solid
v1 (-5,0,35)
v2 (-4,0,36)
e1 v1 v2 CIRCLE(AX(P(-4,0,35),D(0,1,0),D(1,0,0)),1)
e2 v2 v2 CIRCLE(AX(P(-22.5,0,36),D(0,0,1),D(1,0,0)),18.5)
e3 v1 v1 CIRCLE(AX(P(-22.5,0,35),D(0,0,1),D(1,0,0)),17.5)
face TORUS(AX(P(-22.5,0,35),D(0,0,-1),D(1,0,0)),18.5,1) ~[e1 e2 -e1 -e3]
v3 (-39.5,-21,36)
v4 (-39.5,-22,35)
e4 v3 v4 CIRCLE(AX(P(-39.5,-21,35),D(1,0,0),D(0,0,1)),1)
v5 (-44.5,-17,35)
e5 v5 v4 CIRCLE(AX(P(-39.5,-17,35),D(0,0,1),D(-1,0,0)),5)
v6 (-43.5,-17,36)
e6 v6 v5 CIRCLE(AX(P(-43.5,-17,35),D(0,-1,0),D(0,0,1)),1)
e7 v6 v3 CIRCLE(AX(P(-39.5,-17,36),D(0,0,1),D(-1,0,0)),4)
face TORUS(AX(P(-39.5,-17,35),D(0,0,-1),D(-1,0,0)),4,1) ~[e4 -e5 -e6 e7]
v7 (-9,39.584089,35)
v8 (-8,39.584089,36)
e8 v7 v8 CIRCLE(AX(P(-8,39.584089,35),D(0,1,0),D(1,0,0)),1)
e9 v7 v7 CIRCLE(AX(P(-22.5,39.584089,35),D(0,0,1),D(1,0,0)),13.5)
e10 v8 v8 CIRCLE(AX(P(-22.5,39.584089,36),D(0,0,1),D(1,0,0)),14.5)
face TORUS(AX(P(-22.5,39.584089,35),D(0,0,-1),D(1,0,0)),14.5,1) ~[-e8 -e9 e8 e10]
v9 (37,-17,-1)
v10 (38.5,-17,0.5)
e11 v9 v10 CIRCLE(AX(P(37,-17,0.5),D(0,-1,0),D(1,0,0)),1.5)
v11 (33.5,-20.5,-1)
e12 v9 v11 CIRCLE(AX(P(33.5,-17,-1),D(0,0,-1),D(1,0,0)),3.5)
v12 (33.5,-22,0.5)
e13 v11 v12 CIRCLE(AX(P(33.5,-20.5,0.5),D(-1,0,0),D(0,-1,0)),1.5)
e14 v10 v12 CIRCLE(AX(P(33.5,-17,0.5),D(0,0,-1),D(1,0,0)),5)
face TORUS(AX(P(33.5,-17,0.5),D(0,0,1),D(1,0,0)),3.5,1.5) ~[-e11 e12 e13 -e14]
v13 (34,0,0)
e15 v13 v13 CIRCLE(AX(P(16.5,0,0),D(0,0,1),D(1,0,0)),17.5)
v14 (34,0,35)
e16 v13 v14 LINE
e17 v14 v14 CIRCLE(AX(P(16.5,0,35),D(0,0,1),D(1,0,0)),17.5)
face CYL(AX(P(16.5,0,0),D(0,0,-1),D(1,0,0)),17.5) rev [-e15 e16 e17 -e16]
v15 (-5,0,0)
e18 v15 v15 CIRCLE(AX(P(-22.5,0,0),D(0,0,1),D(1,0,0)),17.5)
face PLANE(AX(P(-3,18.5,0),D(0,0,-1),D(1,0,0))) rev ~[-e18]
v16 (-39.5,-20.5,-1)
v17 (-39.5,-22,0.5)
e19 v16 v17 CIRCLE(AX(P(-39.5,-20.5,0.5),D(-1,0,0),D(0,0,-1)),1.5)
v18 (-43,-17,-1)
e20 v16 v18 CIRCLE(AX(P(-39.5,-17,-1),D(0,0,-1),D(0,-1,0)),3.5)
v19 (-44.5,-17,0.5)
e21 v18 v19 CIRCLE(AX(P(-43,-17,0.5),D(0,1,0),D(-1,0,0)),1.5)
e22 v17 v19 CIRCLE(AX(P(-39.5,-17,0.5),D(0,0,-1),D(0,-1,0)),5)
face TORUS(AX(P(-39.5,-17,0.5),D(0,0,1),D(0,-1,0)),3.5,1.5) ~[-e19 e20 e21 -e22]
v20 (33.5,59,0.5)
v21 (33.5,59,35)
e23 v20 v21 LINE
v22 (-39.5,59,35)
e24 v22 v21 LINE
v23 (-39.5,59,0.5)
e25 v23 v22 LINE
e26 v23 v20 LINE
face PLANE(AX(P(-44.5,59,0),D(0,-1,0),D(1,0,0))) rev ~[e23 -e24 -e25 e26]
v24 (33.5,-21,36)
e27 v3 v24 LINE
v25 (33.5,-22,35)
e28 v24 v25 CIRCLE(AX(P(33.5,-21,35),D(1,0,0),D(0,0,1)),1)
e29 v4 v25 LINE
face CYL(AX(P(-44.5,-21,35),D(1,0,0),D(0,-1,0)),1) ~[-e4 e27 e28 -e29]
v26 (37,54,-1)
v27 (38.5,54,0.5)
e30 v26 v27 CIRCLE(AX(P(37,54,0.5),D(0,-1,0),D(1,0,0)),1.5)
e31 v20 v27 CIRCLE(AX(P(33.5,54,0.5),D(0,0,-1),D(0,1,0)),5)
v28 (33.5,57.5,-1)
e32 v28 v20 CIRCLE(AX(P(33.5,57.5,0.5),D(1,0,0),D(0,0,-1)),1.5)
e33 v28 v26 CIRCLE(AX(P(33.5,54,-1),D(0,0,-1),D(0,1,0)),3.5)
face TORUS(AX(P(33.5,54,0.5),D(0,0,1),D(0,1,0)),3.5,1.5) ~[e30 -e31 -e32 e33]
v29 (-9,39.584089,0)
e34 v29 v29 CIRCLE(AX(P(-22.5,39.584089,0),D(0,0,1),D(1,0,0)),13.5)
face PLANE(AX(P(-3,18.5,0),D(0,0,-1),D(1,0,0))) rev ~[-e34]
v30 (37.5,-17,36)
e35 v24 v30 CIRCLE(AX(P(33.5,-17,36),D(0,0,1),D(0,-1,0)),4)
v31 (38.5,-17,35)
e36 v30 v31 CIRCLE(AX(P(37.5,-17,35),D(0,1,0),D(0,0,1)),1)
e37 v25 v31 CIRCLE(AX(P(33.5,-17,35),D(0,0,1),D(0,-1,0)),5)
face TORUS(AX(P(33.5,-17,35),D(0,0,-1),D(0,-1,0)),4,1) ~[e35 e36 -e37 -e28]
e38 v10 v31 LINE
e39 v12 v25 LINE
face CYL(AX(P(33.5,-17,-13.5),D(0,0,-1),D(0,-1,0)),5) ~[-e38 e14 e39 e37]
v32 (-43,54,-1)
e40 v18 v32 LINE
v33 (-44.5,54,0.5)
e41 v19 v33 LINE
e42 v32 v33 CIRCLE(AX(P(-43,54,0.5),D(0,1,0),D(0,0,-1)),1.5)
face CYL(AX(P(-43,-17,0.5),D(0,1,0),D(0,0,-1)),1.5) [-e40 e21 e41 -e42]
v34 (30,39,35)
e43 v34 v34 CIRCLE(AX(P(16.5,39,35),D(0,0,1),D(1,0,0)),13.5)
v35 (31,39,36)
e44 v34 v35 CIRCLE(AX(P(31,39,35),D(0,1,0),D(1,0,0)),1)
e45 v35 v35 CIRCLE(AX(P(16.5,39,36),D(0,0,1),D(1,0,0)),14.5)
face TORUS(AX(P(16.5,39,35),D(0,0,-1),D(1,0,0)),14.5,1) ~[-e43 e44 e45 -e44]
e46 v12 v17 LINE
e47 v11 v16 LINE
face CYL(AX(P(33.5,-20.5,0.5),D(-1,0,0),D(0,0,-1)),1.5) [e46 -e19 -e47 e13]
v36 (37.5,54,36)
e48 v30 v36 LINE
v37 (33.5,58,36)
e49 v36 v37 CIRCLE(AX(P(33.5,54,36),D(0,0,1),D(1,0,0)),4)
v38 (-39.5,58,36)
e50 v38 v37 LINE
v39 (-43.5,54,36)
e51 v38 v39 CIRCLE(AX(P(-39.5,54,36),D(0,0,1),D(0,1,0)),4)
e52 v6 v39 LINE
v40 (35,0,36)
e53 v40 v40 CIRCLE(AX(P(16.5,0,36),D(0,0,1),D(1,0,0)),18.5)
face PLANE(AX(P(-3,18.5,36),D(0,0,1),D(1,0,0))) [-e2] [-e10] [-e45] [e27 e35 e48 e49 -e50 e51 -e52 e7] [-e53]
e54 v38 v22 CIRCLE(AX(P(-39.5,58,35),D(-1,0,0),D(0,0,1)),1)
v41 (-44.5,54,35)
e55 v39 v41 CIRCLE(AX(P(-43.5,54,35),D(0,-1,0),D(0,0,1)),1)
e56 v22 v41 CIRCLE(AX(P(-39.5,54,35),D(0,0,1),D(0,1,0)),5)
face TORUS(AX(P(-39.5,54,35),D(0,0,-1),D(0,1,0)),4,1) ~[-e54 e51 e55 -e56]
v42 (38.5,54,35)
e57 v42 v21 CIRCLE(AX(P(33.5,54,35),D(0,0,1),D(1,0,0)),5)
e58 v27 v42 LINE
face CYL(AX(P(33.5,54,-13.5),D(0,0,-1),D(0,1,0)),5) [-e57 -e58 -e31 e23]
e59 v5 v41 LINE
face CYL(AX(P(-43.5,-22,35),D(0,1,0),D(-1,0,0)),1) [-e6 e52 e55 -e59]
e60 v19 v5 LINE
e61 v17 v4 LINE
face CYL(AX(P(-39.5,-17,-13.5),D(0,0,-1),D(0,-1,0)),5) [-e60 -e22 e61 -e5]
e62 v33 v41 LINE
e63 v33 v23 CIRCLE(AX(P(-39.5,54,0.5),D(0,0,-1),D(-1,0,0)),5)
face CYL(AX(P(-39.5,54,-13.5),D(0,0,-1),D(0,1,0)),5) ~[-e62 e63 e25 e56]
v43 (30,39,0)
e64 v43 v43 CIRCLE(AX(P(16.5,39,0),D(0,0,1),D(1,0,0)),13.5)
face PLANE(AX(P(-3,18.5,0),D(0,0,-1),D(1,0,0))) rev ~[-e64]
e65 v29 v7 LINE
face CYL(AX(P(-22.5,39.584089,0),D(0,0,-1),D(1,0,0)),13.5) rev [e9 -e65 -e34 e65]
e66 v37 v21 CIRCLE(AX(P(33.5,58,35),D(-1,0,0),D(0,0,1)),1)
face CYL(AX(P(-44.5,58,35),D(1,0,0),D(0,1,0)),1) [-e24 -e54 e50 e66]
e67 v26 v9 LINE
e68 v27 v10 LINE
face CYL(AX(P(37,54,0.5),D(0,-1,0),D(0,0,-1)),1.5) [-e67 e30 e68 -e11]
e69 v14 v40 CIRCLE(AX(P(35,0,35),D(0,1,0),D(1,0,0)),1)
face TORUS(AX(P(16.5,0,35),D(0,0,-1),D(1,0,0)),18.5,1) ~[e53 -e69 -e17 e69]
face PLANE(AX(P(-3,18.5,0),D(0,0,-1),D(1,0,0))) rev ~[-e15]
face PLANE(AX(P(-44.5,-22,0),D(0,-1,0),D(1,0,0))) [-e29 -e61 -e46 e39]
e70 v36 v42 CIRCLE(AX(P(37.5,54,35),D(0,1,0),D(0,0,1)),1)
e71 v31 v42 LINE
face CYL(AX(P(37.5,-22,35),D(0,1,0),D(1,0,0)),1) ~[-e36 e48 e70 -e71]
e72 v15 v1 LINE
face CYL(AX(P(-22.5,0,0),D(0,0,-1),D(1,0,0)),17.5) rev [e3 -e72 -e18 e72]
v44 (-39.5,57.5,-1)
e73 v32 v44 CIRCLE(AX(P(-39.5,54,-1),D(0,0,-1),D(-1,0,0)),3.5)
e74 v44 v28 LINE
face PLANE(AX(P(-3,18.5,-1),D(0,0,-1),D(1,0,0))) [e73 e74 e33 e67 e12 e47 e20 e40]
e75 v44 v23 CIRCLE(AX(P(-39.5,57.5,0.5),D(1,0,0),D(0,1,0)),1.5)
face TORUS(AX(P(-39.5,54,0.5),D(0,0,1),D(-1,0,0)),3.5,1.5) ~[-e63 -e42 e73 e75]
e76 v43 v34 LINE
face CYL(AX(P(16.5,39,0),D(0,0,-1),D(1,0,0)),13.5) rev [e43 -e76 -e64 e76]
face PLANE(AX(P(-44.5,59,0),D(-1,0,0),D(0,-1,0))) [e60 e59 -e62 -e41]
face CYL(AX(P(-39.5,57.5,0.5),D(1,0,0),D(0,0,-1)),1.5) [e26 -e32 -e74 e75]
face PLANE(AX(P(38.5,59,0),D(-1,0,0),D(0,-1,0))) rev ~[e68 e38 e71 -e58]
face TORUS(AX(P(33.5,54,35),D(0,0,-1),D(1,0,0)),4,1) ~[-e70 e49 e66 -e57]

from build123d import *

# Parameters (mm, degrees)
F0_W         = 83
F0_H         = 81
F0_R         = 17.5
F0_R_2       = 13.5
F1_DEPTH     = 36
F2_R         = 1
F3_W         = 83
F3_H         = 81
F4_DEPTH     = 1
F5_T1_DEPTH  = 49.5
F5_T4_ANGLE  = 90
F5_T6_ANGLE  = 90
F5_T8_ANGLE  = 90
F5_T10_ANGLE = 90
F6_R         = 1.5


# Not quite as in the source:
# - a fillet or chamfer that OpenCascade refuses, or shapes differently, is made with other operations: its cross-section is extruded or revolved along the edge and cut away or added
# - a feature names something its author has since deleted; it is built from what else it names


with BuildPart() as f1:
    # F0 (on Top) → F1 (new body)
    with BuildSketch(Plane.XY):
        with Locations((-3, 18.5)):
            Rectangle(F0_W, F0_H)
        with Locations((-22.5, 0)):
            Circle(F0_R, mode=Mode.SUBTRACT)
        with Locations((16.5, 0)):
            Circle(F0_R, mode=Mode.SUBTRACT)
        with Locations((-22.5, 39.5840890706)):
            Circle(F0_R_2, mode=Mode.SUBTRACT)
        with Locations((16.5, 39)):
            Circle(F0_R_2, mode=Mode.SUBTRACT)
    extrude(amount=F1_DEPTH)

    # F2
    f2_edges = [f1.edges().sort_by_distance(p)[0] for p in [
        (-3, 59, 36),
        (-44.5, 18.5, 36),
        (-3, -22, 36),
        (38.5, 18.5, 36),
        (-40, 0, 36),
        (-1, 0, 36),
        (-36, 39.584089, 36),
        (3, 39, 36),
    ]]
    fillet(f2_edges, radius=F2_R)

    # F3 (on face) → F4 (join)
    with BuildSketch(Plane(origin=(0, 0, 0), x_dir=(1, 0, 0), z_dir=(0, 0, -1))):
        with Locations((-3, -18.5)):
            Rectangle(F3_W, F3_H)
    extrude(amount=F4_DEPTH)

    # F5: fillet of radius 5 on 4 edges, made by hand

    # F5_s2 → F5_t1 (cut)
    with BuildSketch(Plane.XY.offset(-13.5)):
        with BuildLine():
            ThreePointArc((-39.5, 59), (-43.0355339059, 57.5355339059), (-44.5, 54))
            Line((-44.5, 54), (-44.5, 59))
            Line((-44.5, 59), (-39.5, 59))
        make_face()
        with BuildLine():
            ThreePointArc((-39.5, -22), (-43.0355339059, -20.5355339059), (-44.5, -17))
            Line((-44.5, -17), (-44.5, -22))
            Line((-44.5, -22), (-39.5, -22))
        make_face()
        with BuildLine():
            ThreePointArc((33.5, -22), (37.0355339059, -20.5355339059), (38.5, -17))
            Line((38.5, -17), (38.5, -22))
            Line((38.5, -22), (33.5, -22))
        make_face()
        with BuildLine():
            ThreePointArc((33.5, 59), (37.0355339059, 57.5355339059), (38.5, 54))
            Line((38.5, 54), (38.5, 59))
            Line((38.5, 59), (33.5, 59))
        make_face()
    extrude(amount=F5_T1_DEPTH, mode=Mode.SUBTRACT)

    # F5_s3 → F5_t4 (revolve, cut)
    with BuildSketch(Plane.XZ.offset(-54)):
        with BuildLine():
            ThreePointArc((37.5, 36), (38.2071067812, 35.7071067812), (38.5, 35))
            Line((38.5, 35), (38.5, 36))
            Line((38.5, 36), (37.5, 36))
        make_face()
    revolve(axis=Axis((33.5, 54, 36), (0, 0, 1)), revolution_arc=F5_T4_ANGLE, mode=Mode.SUBTRACT)

    # F5_s5 → F5_t6 (revolve, cut)
    with BuildSketch(Plane.YZ.offset(33.5)):
        with BuildLine():
            ThreePointArc((-21, 36), (-21.7071067812, 35.7071067812), (-22, 35))
            Line((-22, 35), (-22, 36))
            Line((-22, 36), (-21, 36))
        make_face()
    revolve(axis=Axis((33.5, -17, 36), (0, 0, 1)), revolution_arc=F5_T6_ANGLE, mode=Mode.SUBTRACT)

    # F5_s7 → F5_t8 (revolve, cut)
    with BuildSketch(Plane.XZ.offset(17)):
        with BuildLine():
            ThreePointArc((-43.5, 36), (-44.2071067812, 35.7071067812), (-44.5, 35))
            Line((-44.5, 35), (-44.5, 36))
            Line((-44.5, 36), (-43.5, 36))
        make_face()
    revolve(axis=Axis((-39.5, -17, 36), (0, 0, 1)), revolution_arc=F5_T8_ANGLE, mode=Mode.SUBTRACT)

    # F5_s9 → F5_t10 (revolve, cut)
    with BuildSketch(Plane.YZ.offset(-39.5)):
        with BuildLine():
            ThreePointArc((58, 36), (58.7071067812, 35.7071067812), (59, 35))
            Line((59, 35), (59, 36))
            Line((59, 36), (58, 36))
        make_face()
    revolve(axis=Axis((-39.5, 54, 36), (0, 0, 1)), revolution_arc=F5_T10_ANGLE, mode=Mode.SUBTRACT)

    # F6
    f6_edges = [f1.edges().sort_by_distance(p)[0] for p in [
        (37.035534, -20.535534, -1),
        (38.5, 18.5, -1),
        (37.035534, 57.535534, -1),
        (-3, 59, -1),
        (-43.035534, 57.535534, -1),
        (-44.5, 18.5, -1),
        (-43.035534, -20.535534, -1),
        (-3, -22, -1),
    ]]
    fillet(f6_edges, radius=F6_R)


solid = f1.part
